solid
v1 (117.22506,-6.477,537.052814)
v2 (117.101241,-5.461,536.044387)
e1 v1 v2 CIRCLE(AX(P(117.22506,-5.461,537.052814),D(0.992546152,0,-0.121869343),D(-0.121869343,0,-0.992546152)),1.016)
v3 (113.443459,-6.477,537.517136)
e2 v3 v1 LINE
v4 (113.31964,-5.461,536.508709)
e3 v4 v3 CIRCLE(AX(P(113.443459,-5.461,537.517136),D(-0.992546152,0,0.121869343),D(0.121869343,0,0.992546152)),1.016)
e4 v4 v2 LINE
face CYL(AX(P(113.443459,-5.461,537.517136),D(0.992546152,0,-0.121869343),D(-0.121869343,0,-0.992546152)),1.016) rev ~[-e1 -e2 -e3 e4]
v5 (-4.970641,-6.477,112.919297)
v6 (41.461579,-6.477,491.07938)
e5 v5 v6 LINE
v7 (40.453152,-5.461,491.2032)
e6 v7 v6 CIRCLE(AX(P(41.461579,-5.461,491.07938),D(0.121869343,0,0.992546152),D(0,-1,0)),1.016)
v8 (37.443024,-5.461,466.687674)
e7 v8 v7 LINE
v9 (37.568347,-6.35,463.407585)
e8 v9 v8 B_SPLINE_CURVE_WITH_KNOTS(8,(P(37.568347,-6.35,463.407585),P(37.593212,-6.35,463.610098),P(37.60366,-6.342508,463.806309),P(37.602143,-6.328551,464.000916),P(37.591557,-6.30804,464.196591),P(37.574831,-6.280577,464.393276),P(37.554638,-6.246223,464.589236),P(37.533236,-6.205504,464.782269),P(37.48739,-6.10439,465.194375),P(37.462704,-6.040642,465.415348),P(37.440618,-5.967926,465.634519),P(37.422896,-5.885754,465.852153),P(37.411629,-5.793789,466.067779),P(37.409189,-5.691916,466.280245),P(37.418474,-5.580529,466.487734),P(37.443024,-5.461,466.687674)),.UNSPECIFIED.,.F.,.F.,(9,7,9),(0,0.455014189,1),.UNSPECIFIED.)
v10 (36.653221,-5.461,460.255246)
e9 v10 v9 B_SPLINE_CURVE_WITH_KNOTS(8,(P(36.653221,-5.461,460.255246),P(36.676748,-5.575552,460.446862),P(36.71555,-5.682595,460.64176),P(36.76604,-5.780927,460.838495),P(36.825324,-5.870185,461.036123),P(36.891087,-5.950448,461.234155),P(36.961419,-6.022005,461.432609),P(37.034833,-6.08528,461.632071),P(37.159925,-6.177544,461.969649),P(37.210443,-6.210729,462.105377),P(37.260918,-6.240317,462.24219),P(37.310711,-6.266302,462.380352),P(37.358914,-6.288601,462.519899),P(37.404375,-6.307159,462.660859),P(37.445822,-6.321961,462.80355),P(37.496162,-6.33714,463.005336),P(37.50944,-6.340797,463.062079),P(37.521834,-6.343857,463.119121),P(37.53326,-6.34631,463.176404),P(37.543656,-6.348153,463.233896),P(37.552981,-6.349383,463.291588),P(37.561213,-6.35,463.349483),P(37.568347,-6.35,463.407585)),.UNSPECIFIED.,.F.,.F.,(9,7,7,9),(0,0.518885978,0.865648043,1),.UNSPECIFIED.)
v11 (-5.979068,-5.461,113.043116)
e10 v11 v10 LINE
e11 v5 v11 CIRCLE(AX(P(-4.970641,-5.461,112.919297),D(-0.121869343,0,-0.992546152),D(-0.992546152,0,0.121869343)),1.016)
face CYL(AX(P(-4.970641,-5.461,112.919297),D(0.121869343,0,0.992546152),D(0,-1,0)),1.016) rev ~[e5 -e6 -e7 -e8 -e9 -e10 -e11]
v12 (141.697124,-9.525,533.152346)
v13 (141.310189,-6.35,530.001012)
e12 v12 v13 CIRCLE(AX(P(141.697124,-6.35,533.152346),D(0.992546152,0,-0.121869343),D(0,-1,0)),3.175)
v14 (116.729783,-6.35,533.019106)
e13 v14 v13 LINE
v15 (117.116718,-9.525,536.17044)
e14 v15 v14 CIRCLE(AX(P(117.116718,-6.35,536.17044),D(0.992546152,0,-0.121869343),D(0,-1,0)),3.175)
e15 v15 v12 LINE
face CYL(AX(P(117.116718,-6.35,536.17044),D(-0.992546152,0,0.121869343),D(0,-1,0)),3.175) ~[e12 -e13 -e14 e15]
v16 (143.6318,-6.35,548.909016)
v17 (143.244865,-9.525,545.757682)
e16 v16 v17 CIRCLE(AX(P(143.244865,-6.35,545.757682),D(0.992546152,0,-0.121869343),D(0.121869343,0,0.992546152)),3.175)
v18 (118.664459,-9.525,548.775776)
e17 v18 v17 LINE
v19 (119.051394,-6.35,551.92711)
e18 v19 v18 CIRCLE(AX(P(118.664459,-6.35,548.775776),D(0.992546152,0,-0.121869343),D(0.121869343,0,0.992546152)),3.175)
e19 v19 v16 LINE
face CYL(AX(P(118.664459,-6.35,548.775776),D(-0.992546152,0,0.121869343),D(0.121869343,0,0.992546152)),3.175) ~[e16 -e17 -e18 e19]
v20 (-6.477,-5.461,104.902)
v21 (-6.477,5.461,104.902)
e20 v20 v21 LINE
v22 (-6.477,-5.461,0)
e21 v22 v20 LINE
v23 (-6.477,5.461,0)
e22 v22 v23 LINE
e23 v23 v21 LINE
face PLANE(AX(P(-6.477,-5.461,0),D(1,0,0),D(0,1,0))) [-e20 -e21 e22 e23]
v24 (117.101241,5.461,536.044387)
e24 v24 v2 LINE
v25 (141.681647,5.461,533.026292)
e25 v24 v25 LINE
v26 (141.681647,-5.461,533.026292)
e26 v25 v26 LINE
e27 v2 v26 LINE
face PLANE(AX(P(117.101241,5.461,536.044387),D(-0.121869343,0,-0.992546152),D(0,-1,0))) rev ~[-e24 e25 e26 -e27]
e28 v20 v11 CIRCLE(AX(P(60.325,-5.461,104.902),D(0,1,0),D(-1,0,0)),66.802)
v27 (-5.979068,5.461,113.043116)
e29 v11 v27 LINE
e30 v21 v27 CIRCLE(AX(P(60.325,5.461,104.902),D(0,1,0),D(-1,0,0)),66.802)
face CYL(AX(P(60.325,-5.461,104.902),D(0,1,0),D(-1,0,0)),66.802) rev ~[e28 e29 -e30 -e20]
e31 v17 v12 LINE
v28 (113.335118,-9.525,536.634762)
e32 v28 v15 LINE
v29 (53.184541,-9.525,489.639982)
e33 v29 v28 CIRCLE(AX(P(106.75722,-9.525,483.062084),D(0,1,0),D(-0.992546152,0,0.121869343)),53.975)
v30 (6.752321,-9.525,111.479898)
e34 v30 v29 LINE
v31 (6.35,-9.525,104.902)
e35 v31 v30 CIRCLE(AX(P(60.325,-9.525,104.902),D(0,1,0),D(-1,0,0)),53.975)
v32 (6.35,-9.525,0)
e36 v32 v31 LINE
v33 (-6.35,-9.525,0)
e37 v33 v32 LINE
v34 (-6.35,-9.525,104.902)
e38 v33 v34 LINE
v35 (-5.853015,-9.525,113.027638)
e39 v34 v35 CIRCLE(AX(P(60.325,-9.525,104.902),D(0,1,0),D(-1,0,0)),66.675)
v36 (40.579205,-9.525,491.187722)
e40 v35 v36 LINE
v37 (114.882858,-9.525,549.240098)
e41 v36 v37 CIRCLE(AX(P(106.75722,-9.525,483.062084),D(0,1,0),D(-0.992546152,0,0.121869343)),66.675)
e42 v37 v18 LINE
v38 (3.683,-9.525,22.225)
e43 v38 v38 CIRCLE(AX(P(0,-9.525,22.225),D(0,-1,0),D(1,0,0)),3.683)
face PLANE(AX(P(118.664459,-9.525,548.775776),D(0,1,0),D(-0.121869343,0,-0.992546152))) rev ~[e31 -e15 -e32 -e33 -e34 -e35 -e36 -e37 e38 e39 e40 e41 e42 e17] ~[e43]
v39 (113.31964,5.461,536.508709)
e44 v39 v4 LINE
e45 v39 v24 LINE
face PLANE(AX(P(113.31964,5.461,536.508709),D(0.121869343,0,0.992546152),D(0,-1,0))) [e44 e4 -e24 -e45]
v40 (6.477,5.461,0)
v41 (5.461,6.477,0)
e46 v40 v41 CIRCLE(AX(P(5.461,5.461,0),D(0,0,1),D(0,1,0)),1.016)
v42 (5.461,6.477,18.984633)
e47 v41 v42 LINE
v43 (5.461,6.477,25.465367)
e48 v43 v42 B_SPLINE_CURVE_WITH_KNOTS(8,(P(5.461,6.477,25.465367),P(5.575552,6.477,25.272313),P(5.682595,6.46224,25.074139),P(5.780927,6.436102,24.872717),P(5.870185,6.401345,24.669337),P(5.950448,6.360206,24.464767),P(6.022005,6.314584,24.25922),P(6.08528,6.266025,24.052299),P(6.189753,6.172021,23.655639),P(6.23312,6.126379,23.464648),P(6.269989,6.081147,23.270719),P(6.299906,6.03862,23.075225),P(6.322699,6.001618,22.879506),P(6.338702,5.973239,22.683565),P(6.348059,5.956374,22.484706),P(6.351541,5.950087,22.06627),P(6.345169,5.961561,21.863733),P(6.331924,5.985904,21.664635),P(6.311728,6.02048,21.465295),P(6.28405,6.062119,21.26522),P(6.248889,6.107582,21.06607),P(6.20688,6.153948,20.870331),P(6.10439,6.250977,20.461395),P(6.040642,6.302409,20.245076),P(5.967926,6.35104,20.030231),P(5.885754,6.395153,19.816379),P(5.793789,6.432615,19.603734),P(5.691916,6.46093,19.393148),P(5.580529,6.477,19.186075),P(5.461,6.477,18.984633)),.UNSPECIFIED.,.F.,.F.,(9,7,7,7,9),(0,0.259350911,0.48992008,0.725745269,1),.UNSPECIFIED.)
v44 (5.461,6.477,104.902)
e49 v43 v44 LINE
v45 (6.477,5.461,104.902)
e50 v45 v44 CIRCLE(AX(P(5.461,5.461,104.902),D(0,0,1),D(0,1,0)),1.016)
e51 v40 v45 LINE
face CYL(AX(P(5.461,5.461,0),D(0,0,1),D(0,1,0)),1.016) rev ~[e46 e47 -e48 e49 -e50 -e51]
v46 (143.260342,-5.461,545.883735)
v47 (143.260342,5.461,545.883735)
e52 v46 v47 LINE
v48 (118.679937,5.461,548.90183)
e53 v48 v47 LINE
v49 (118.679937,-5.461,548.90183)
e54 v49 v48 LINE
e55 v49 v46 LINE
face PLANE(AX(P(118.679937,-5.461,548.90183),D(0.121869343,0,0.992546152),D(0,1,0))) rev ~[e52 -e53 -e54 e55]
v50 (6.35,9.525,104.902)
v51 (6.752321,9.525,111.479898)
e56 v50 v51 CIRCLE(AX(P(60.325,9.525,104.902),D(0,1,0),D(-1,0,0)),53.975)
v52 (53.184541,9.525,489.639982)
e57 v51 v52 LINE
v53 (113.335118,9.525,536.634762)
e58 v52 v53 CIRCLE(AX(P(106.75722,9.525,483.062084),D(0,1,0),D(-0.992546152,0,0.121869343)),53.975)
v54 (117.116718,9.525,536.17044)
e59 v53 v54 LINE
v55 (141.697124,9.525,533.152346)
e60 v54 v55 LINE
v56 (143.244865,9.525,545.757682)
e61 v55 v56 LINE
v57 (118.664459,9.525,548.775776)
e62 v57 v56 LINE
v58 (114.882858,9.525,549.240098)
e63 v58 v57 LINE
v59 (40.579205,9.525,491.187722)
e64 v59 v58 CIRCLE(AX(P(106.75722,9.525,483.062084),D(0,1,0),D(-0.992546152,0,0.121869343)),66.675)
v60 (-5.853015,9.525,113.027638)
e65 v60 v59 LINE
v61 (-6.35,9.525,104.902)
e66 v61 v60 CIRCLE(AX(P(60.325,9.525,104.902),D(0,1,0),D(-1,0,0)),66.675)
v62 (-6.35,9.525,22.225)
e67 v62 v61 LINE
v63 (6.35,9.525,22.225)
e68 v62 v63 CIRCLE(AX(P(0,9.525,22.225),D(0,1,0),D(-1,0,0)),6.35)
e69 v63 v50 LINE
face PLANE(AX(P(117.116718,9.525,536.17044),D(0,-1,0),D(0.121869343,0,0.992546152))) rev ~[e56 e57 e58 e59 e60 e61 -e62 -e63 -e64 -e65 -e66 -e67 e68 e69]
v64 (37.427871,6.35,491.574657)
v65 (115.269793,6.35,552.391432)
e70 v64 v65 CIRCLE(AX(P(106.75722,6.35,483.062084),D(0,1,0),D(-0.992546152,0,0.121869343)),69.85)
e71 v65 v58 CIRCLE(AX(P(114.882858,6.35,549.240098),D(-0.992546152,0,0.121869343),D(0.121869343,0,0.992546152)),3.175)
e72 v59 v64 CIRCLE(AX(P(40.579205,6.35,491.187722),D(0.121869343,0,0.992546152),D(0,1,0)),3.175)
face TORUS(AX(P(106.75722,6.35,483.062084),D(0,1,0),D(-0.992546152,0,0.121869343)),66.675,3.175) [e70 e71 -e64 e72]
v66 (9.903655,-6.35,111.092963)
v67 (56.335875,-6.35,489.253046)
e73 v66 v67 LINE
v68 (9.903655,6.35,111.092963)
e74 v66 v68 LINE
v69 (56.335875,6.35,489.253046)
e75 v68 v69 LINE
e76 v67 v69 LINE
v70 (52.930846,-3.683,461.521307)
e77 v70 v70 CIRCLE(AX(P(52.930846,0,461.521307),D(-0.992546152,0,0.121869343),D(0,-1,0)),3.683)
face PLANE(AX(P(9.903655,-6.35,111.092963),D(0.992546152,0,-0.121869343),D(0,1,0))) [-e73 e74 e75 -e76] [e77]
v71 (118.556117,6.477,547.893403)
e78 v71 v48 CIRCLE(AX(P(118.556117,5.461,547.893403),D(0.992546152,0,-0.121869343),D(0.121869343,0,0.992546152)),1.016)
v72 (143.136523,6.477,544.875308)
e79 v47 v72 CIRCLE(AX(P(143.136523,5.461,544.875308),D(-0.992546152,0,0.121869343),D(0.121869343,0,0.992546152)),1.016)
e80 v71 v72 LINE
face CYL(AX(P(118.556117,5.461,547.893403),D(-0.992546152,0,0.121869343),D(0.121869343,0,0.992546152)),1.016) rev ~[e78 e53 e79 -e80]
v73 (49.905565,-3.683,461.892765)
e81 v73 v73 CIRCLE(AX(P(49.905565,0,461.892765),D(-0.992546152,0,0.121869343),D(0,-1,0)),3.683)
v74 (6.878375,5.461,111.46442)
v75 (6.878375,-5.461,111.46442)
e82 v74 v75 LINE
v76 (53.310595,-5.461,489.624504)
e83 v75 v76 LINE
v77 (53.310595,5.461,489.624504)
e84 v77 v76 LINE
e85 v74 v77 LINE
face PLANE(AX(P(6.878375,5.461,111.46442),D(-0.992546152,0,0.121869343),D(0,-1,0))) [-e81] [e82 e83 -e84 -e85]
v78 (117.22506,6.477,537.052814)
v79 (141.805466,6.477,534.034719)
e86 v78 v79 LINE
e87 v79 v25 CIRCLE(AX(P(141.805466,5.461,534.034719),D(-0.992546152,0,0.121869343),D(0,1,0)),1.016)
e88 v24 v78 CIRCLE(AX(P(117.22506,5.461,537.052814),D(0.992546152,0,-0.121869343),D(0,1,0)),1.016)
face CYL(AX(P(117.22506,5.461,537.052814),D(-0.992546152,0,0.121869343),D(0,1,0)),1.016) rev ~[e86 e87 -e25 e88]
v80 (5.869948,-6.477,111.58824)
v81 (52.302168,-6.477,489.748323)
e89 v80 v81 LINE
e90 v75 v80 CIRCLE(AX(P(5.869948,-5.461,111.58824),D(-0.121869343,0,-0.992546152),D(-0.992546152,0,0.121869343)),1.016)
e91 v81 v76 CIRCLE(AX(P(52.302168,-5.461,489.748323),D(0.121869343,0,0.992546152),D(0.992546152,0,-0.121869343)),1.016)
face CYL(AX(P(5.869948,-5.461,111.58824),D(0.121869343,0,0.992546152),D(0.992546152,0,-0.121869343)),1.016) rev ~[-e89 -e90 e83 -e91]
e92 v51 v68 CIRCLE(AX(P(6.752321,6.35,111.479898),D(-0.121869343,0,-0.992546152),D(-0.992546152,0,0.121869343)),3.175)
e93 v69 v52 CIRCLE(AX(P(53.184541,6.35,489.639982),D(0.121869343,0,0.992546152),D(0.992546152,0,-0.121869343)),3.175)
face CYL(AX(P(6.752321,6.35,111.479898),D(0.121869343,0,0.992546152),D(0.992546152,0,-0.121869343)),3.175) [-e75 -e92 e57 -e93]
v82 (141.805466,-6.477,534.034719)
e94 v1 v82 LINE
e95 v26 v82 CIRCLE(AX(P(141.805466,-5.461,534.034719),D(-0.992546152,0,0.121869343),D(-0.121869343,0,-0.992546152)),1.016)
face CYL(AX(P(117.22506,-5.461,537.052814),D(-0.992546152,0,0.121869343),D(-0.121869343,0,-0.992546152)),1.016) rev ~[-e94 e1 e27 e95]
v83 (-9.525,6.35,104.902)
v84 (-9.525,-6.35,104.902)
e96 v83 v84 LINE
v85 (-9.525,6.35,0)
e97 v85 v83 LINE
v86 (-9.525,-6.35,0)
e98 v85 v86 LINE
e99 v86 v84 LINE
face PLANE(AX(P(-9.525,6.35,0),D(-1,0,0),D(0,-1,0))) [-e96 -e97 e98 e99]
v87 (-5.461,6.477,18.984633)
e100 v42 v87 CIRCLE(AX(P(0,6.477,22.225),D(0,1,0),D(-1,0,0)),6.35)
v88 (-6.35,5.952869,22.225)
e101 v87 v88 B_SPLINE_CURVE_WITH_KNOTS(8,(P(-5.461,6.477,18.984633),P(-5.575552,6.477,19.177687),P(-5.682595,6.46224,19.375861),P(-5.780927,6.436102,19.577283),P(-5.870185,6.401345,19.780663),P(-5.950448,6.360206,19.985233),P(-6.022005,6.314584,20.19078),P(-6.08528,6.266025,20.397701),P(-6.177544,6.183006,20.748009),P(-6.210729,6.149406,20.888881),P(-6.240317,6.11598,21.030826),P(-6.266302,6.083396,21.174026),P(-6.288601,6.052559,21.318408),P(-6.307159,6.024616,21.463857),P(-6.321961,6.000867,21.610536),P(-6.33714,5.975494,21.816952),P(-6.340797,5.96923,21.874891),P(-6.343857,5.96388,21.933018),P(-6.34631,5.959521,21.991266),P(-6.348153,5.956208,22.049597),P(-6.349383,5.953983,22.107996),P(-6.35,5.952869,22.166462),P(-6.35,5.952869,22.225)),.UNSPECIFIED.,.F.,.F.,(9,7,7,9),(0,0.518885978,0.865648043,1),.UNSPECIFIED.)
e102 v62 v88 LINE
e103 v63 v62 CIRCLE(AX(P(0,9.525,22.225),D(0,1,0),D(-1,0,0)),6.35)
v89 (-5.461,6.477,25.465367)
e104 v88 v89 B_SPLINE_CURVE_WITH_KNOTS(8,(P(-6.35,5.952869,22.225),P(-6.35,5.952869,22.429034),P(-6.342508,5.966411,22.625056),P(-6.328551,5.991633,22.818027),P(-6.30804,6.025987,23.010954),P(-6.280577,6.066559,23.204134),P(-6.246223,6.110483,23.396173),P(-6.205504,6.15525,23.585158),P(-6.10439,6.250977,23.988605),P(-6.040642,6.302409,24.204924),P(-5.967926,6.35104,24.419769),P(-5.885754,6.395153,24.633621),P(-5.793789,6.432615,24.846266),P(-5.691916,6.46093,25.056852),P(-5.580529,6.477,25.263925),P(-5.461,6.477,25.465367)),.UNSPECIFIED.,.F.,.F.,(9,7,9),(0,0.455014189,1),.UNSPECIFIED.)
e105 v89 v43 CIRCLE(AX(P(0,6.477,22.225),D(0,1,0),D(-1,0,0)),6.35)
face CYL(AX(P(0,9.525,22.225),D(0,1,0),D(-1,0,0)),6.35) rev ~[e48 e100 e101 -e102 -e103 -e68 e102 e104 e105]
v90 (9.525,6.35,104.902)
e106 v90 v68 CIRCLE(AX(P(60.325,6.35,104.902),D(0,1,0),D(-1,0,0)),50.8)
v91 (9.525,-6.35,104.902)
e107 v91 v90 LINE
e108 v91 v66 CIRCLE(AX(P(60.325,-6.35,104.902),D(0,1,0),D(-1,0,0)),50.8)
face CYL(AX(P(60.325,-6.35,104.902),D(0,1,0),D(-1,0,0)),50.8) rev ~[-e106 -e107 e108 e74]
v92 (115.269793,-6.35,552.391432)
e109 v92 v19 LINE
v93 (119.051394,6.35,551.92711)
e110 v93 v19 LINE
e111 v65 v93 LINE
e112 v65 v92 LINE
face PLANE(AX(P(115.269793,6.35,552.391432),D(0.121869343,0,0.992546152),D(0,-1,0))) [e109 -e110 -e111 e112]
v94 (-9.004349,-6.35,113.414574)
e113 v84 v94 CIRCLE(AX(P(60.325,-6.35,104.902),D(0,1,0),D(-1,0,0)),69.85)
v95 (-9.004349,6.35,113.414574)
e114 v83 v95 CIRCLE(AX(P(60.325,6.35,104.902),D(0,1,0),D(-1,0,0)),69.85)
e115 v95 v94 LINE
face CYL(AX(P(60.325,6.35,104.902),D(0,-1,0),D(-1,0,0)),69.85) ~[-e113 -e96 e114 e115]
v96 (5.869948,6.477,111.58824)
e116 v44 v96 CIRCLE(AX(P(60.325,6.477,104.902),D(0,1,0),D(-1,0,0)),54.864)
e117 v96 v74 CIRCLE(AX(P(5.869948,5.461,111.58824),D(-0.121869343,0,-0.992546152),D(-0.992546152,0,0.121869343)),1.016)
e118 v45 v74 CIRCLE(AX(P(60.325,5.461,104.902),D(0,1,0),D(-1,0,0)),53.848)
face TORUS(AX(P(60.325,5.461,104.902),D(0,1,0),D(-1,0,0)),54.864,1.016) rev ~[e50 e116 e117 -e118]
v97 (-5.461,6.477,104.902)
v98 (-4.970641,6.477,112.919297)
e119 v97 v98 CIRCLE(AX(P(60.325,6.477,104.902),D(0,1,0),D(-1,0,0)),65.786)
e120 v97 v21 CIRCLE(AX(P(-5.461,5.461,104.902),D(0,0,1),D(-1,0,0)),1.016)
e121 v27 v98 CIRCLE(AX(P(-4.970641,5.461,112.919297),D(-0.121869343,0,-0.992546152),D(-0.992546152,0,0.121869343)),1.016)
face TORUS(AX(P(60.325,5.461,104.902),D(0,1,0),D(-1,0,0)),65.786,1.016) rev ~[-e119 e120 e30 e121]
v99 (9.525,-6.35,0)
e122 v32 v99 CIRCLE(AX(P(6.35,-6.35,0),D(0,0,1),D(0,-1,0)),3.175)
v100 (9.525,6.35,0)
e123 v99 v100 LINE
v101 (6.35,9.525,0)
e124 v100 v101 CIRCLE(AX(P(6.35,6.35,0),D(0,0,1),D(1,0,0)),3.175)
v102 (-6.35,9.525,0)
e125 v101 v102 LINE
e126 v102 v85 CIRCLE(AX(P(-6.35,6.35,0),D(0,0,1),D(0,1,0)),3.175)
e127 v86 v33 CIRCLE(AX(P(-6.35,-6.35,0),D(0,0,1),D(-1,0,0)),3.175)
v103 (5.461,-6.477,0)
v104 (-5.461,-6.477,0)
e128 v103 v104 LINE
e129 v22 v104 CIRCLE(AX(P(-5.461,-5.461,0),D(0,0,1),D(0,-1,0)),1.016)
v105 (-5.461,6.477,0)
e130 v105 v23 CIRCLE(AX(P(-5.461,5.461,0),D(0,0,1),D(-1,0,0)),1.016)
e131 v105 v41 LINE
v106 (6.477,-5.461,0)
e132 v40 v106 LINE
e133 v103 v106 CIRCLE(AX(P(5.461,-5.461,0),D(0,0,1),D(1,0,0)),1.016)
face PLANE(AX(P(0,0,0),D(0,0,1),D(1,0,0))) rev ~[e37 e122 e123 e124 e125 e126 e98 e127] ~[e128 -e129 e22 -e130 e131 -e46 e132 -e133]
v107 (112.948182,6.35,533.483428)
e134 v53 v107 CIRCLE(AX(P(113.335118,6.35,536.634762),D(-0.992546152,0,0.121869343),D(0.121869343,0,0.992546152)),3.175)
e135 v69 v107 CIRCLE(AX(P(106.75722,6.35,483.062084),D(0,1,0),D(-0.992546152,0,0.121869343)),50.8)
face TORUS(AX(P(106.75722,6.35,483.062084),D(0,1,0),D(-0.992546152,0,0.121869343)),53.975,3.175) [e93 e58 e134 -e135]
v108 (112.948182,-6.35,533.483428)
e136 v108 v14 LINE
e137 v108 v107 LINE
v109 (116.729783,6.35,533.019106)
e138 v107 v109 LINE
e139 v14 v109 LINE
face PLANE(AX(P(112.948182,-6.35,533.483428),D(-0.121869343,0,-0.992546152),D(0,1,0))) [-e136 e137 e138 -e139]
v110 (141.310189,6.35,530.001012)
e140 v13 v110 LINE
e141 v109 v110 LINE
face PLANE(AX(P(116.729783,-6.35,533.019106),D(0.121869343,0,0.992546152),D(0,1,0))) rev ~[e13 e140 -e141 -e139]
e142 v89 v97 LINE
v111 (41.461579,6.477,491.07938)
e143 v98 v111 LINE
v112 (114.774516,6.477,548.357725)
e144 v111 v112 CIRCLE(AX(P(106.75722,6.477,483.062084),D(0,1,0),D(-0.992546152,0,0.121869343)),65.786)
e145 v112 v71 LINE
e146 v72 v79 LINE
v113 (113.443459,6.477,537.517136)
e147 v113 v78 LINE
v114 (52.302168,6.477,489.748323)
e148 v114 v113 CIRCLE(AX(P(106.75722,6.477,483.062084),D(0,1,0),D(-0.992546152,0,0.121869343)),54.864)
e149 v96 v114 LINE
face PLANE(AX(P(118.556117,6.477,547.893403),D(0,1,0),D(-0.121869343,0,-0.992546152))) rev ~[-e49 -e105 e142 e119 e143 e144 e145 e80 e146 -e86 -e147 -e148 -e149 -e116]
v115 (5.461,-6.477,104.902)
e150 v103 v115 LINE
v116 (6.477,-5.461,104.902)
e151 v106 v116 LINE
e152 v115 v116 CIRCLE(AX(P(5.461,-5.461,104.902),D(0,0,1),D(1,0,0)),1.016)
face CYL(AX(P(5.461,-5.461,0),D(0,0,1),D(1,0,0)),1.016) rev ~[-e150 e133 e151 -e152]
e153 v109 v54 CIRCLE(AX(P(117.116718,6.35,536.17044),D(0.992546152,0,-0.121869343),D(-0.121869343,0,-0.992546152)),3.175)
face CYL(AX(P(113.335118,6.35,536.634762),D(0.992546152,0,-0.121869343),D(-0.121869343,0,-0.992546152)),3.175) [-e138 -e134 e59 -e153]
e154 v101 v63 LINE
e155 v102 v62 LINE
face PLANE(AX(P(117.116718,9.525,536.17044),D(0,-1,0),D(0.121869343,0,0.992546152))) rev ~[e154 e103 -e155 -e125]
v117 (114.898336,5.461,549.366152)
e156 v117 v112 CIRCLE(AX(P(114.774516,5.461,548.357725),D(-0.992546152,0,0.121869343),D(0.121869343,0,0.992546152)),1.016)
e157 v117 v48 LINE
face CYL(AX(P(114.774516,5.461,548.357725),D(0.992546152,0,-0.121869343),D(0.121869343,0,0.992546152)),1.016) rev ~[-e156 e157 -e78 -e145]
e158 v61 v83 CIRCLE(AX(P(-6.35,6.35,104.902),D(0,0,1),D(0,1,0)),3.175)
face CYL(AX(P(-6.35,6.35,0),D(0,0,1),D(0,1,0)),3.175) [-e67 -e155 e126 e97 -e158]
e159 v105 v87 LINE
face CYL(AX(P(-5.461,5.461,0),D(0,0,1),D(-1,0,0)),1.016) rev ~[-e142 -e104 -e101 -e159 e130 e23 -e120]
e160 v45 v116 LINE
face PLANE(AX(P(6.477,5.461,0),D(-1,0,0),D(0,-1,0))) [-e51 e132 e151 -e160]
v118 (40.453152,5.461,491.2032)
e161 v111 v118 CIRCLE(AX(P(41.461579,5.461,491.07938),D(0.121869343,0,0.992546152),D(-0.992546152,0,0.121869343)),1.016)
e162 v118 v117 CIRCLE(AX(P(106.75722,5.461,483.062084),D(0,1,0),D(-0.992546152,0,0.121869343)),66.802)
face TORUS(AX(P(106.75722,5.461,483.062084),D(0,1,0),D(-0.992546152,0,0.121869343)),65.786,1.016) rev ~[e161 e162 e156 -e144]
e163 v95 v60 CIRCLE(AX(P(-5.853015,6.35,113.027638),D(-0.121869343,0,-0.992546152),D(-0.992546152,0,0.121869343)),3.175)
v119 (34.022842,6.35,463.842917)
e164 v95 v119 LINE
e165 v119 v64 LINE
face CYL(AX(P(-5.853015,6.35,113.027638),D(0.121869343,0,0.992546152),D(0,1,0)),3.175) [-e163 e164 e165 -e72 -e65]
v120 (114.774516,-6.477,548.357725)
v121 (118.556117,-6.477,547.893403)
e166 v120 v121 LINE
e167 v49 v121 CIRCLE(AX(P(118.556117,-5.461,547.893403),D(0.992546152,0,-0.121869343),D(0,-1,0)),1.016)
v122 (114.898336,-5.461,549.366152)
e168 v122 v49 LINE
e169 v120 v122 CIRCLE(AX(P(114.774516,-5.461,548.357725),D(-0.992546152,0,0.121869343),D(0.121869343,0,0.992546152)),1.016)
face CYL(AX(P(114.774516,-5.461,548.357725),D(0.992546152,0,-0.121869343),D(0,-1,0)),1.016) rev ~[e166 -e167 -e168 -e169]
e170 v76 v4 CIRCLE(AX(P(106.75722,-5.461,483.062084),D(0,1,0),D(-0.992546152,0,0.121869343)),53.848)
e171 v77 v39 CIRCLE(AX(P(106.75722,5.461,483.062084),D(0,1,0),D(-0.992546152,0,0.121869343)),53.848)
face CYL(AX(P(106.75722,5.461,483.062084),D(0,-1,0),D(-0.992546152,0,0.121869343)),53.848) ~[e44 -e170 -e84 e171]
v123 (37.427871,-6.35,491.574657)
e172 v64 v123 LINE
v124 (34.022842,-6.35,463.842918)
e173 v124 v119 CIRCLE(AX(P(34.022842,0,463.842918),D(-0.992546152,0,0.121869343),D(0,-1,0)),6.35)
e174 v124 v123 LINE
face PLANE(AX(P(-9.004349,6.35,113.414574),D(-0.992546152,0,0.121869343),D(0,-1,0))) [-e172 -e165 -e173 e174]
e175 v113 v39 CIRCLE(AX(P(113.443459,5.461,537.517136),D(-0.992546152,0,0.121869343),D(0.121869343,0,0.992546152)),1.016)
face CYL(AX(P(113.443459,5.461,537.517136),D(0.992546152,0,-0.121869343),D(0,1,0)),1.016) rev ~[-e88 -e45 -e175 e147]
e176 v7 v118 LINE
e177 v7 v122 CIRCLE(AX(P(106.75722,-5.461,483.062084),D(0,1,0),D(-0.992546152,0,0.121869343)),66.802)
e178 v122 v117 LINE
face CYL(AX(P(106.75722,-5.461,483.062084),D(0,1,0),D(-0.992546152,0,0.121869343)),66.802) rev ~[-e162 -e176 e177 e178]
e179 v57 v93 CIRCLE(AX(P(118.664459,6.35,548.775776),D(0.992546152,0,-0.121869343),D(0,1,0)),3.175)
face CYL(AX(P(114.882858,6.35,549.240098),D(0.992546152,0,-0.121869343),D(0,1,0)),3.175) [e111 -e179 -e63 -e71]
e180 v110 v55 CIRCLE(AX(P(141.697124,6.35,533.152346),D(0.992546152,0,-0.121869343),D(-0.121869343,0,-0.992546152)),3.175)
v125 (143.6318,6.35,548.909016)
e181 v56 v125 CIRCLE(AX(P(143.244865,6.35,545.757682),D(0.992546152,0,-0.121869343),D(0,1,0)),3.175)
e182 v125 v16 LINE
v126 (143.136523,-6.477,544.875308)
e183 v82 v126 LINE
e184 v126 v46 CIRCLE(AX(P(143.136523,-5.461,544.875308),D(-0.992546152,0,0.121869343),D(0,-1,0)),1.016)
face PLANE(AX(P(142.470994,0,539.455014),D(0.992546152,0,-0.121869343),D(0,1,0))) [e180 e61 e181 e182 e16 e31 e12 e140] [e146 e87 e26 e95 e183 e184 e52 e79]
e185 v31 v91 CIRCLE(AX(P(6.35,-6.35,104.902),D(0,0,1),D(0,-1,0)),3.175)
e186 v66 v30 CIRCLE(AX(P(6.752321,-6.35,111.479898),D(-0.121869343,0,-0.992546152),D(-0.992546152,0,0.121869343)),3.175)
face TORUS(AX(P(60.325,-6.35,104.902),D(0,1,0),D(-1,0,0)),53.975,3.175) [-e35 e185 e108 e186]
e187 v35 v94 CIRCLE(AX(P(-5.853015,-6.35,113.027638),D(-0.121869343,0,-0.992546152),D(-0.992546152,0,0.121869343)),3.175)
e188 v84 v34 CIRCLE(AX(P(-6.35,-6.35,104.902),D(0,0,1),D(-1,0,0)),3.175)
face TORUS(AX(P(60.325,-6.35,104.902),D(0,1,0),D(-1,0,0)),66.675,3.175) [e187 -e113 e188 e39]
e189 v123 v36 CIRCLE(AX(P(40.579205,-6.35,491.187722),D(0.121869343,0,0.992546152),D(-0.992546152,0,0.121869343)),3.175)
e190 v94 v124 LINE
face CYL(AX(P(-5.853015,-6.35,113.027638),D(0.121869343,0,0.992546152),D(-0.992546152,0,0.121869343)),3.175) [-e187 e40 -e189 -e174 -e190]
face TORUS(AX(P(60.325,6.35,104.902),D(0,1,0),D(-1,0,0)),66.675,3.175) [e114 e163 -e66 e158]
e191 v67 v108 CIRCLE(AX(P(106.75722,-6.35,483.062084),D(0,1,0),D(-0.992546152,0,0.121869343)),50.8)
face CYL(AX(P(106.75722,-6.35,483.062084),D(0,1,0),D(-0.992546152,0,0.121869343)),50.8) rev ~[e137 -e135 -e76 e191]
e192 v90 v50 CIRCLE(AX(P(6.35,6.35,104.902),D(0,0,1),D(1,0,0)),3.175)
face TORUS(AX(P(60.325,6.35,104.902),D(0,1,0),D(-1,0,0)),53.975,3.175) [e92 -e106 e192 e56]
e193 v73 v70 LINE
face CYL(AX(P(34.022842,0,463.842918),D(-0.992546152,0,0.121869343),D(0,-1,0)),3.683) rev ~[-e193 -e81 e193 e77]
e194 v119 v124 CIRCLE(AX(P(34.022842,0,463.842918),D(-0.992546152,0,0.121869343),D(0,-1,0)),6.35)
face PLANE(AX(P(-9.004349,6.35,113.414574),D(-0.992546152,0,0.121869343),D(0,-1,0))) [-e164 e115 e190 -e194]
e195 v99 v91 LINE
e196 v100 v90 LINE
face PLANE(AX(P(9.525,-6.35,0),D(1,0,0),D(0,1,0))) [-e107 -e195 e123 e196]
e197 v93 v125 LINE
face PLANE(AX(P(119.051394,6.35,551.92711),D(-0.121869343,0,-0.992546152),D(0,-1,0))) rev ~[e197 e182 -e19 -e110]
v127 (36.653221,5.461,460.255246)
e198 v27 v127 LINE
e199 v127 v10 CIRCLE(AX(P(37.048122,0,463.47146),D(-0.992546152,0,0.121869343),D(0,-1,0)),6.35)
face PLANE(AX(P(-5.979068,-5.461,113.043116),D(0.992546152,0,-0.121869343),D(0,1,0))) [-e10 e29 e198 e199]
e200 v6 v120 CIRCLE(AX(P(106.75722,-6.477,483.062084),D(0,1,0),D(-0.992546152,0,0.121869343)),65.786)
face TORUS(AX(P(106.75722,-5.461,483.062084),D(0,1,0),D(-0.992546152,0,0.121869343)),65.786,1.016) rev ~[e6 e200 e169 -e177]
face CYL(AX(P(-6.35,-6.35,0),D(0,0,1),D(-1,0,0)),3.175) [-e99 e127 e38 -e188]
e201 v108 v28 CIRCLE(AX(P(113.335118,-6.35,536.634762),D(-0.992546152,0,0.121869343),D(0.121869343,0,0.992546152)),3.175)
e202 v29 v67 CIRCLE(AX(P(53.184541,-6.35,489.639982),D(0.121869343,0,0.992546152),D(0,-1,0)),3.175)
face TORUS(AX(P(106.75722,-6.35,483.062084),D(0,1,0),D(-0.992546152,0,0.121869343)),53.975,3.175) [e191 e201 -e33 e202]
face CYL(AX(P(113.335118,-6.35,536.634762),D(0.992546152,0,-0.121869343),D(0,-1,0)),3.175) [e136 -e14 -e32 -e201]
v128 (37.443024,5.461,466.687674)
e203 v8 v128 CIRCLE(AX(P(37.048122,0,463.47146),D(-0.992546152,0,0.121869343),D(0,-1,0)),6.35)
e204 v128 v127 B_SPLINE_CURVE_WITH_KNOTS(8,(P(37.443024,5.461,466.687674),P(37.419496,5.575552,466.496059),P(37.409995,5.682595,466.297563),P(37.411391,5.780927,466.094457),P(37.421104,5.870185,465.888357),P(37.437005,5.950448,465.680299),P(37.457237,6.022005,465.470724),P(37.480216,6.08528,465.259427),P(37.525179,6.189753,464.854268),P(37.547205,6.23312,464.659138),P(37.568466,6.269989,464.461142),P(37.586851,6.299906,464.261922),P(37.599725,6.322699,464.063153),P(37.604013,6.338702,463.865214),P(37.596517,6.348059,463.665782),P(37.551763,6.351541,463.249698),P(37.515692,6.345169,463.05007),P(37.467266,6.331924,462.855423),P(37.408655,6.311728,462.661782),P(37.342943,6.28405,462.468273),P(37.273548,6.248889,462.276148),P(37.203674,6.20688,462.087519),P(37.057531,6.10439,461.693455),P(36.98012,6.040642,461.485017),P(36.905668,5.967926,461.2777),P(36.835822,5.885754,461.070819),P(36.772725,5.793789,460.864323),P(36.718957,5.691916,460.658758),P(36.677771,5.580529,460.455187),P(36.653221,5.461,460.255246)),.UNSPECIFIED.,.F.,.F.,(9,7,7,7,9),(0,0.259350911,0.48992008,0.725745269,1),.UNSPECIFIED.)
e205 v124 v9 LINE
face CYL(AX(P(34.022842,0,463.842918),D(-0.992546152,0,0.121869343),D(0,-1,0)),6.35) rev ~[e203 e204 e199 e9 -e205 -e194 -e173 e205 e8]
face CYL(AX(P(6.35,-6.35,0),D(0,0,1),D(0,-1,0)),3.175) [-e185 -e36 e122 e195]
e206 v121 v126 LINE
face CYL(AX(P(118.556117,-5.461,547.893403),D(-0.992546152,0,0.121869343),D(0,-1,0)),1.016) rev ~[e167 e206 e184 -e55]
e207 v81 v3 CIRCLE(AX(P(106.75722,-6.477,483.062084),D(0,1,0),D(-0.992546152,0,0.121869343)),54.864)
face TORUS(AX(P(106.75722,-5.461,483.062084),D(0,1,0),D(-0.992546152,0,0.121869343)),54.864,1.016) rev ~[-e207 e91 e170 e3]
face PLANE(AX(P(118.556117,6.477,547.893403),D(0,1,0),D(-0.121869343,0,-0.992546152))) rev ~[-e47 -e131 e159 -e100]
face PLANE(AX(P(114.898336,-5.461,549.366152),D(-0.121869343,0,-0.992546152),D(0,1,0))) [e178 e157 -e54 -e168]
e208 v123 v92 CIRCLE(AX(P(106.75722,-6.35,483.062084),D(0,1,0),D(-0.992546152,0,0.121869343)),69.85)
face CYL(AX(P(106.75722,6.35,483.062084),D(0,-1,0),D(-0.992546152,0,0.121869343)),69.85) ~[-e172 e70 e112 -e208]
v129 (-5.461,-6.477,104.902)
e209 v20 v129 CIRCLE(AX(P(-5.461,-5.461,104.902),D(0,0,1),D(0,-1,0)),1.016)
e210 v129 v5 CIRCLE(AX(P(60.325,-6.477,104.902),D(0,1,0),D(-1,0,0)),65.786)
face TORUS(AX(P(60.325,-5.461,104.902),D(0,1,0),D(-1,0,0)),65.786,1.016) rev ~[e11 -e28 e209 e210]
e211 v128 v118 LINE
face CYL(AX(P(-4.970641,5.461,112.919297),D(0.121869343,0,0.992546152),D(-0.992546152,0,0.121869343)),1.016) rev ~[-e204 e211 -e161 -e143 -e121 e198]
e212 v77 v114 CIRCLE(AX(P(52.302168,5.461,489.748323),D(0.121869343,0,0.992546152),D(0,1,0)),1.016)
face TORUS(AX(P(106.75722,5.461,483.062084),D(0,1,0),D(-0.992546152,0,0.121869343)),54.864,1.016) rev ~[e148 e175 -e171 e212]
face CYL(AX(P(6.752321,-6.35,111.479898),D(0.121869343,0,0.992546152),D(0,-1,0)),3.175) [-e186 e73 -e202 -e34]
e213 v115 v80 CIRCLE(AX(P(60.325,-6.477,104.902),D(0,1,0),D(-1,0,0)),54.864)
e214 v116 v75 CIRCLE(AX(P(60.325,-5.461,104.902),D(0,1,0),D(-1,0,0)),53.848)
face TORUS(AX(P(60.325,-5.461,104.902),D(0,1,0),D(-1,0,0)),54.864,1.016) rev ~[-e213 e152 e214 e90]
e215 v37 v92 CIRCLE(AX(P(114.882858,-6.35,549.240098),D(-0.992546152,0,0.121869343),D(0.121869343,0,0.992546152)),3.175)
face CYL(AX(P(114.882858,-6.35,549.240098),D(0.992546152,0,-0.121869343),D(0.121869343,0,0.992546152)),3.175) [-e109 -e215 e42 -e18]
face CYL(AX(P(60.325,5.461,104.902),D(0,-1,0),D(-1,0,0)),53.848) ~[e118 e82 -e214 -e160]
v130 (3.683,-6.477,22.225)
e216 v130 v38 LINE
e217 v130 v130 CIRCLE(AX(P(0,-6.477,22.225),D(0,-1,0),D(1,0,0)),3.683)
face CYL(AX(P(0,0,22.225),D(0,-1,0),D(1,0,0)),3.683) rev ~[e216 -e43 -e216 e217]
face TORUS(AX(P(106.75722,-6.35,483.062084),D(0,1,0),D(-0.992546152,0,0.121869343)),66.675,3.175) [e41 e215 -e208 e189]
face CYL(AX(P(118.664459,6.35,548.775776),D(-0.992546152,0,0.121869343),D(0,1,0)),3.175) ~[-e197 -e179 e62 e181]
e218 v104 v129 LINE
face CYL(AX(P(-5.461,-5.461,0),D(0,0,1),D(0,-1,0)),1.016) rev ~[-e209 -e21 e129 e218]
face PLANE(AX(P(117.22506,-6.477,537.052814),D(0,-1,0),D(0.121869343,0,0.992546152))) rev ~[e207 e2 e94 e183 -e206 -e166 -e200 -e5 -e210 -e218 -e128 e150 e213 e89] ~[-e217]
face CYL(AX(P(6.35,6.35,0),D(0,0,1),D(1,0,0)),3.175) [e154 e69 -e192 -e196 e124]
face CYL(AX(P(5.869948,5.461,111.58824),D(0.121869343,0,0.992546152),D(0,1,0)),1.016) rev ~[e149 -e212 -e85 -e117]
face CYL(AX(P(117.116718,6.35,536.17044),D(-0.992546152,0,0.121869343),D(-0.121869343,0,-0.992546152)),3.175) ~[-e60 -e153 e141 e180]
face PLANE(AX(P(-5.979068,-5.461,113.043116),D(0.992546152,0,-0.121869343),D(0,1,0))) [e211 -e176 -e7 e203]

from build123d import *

# Parameters (mm, degrees)
F4_R      = 3.683
F5_DEPTH  = 334.01
F6_R      = 3.683
F7_DEPTH  = 25.4
F8_R      = 6.35
F9_DEPTH  = 9.4742
F11_DEPTH = 24.765
F12_R     = 6.35
F13_DEPTH = 12.446


# Not quite as in the source:
# - a feature names something its author has since deleted; it is built from what else it names


with BuildPart() as f2:
    # F2: sweep along a path in F0
    with BuildLine(Plane.XZ) as f2_path:
        Line((0, 0), (0, 104.902))
        ThreePointArc((0, 104.902), (0.1125182852, 108.5847531474), (0.4496534022, 112.2537681409))
        Line((0.4496534022, 112.2537681409), (46.8818732396, 490.4138519163))
        ThreePointArc((46.8818732396, 490.4138519163), (69.6174413383, 530.5988324867), (114.1089879783, 542.9374303731))
        Line((114.1089879783, 542.9374303731), (117.890588816, 542.4731081747))
    # F1 (on Top) → F2 (sweep)
    with BuildSketch(Plane.XY):
        with BuildLine():
            ThreePointArc((-9.525, -6.35), (-8.5950640303, -8.5950640303), (-6.35, -9.525))
            Line((-6.35, -9.525), (6.35, -9.525))
            ThreePointArc((6.35, -9.525), (8.5950640303, -8.5950640303), (9.525, -6.35))
            Line((9.525, -6.35), (9.525, 6.35))
            ThreePointArc((9.525, 6.35), (8.5950640303, 8.5950640303), (6.35, 9.525))
            Line((6.35, 9.525), (-6.35, 9.525))
            ThreePointArc((-6.35, 9.525), (-8.5950640303, 8.5950640303), (-9.525, 6.35))
            Line((-9.525, 6.35), (-9.525, -6.35))
        make_face()
        with BuildLine():
            Line((5.461, -6.477), (-5.461, -6.477))
            ThreePointArc((-5.461, -6.477), (-6.1794204897, -6.1794204897), (-6.477, -5.461))
            Line((-6.477, -5.461), (-6.477, 5.461))
            ThreePointArc((-6.477, 5.461), (-6.1794204897, 6.1794204897), (-5.461, 6.477))
            Line((-5.461, 6.477), (5.461, 6.477))
            ThreePointArc((5.461, 6.477), (6.1794204897, 6.1794204897), (6.477, 5.461))
            Line((6.477, 5.461), (6.477, -5.461))
            ThreePointArc((6.477, -5.461), (6.1794204897, -6.1794204897), (5.461, -6.477))
        make_face(mode=Mode.SUBTRACT)
    sweep(path=f2_path.line)

    # F4 (on Front) → F5 (cut, symmetric)
    with BuildSketch(Plane.XZ):
        with Locations((0, 22.225)):
            Circle(F4_R)
    extrude(amount=F5_DEPTH, both=True, mode=Mode.SUBTRACT)

    # F6 (on face) → F7 (cut)
    with BuildSketch(Plane(origin=(-22.5893491944, 0, 2.7736233219), x_dir=(0, -1, 0), z_dir=(-0.9925461516, 0, 0.1218693434))):
        with Locations((0, 464.5318445404)):
            Circle(F6_R)
    extrude(amount=-F7_DEPTH, mode=Mode.SUBTRACT)

    # F8 (on face) → F9 (cut)
    with BuildSketch(Plane(origin=(-22.5893491944, 0, 2.7736233219), x_dir=(0, -1, 0), z_dir=(-0.9925461516, 0, 0.1218693434))):
        with Locations((0, 464.5318445404)):
            Circle(F8_R)
    extrude(amount=-F9_DEPTH, mode=Mode.SUBTRACT)

    # F10 (on face) → F11 (join)
    with BuildSketch(Plane(origin=(50.5216003355, 0, -6.2032725133), x_dir=(0, 1, 0), z_dir=(0.9925461516, 0, -0.1218693434))):
        with BuildLine():
            ThreePointArc((9.525, 559.1468445404), (8.5950640303, 561.3919085707), (6.35, 562.3218445404))
            Line((6.35, 562.3218445404), (-6.35, 562.3218445404))
            ThreePointArc((-6.35, 562.3218445404), (-8.5950640303, 561.3919085707), (-9.525, 559.1468445404))
            Line((-9.525, 559.1468445404), (-9.525, 546.4468445404))
            ThreePointArc((-9.525, 546.4468445404), (-8.5950640303, 544.2017805101), (-6.35, 543.2718445404))
            Line((-6.35, 543.2718445404), (6.35, 543.2718445404))
            ThreePointArc((6.35, 543.2718445404), (8.5950640303, 544.2017805101), (9.525, 546.4468445404))
            Line((9.525, 546.4468445404), (9.525, 559.1468445404))
        make_face()
        with BuildLine():
            ThreePointArc((-6.477, 558.2578445404), (-6.1794204897, 558.9762650301), (-5.461, 559.2738445404))
            Line((-5.461, 559.2738445404), (5.461, 559.2738445404))
            ThreePointArc((5.461, 559.2738445404), (6.1794204897, 558.9762650301), (6.477, 558.2578445404))
            Line((6.477, 558.2578445404), (6.477, 547.3358445404))
            ThreePointArc((6.477, 547.3358445404), (6.1794204897, 546.6174240507), (5.461, 546.3198445404))
            Line((5.461, 546.3198445404), (-5.461, 546.3198445404))
            ThreePointArc((-5.461, 546.3198445404), (-6.1794204897, 546.6174240507), (-6.477, 547.3358445404))
            Line((-6.477, 547.3358445404), (-6.477, 558.2578445404))
        make_face(mode=Mode.SUBTRACT)
    extrude(amount=F11_DEPTH)

    # F12 (on face) → F13 (cut)
    with BuildSketch(Plane(origin=(0, 9.525, 0), x_dir=(-1, 0, 0), z_dir=(0, 1, 0))):
        with Locations((0, 22.225)):
            Circle(F12_R)
    extrude(amount=-F13_DEPTH, mode=Mode.SUBTRACT)


solid = f2.part
